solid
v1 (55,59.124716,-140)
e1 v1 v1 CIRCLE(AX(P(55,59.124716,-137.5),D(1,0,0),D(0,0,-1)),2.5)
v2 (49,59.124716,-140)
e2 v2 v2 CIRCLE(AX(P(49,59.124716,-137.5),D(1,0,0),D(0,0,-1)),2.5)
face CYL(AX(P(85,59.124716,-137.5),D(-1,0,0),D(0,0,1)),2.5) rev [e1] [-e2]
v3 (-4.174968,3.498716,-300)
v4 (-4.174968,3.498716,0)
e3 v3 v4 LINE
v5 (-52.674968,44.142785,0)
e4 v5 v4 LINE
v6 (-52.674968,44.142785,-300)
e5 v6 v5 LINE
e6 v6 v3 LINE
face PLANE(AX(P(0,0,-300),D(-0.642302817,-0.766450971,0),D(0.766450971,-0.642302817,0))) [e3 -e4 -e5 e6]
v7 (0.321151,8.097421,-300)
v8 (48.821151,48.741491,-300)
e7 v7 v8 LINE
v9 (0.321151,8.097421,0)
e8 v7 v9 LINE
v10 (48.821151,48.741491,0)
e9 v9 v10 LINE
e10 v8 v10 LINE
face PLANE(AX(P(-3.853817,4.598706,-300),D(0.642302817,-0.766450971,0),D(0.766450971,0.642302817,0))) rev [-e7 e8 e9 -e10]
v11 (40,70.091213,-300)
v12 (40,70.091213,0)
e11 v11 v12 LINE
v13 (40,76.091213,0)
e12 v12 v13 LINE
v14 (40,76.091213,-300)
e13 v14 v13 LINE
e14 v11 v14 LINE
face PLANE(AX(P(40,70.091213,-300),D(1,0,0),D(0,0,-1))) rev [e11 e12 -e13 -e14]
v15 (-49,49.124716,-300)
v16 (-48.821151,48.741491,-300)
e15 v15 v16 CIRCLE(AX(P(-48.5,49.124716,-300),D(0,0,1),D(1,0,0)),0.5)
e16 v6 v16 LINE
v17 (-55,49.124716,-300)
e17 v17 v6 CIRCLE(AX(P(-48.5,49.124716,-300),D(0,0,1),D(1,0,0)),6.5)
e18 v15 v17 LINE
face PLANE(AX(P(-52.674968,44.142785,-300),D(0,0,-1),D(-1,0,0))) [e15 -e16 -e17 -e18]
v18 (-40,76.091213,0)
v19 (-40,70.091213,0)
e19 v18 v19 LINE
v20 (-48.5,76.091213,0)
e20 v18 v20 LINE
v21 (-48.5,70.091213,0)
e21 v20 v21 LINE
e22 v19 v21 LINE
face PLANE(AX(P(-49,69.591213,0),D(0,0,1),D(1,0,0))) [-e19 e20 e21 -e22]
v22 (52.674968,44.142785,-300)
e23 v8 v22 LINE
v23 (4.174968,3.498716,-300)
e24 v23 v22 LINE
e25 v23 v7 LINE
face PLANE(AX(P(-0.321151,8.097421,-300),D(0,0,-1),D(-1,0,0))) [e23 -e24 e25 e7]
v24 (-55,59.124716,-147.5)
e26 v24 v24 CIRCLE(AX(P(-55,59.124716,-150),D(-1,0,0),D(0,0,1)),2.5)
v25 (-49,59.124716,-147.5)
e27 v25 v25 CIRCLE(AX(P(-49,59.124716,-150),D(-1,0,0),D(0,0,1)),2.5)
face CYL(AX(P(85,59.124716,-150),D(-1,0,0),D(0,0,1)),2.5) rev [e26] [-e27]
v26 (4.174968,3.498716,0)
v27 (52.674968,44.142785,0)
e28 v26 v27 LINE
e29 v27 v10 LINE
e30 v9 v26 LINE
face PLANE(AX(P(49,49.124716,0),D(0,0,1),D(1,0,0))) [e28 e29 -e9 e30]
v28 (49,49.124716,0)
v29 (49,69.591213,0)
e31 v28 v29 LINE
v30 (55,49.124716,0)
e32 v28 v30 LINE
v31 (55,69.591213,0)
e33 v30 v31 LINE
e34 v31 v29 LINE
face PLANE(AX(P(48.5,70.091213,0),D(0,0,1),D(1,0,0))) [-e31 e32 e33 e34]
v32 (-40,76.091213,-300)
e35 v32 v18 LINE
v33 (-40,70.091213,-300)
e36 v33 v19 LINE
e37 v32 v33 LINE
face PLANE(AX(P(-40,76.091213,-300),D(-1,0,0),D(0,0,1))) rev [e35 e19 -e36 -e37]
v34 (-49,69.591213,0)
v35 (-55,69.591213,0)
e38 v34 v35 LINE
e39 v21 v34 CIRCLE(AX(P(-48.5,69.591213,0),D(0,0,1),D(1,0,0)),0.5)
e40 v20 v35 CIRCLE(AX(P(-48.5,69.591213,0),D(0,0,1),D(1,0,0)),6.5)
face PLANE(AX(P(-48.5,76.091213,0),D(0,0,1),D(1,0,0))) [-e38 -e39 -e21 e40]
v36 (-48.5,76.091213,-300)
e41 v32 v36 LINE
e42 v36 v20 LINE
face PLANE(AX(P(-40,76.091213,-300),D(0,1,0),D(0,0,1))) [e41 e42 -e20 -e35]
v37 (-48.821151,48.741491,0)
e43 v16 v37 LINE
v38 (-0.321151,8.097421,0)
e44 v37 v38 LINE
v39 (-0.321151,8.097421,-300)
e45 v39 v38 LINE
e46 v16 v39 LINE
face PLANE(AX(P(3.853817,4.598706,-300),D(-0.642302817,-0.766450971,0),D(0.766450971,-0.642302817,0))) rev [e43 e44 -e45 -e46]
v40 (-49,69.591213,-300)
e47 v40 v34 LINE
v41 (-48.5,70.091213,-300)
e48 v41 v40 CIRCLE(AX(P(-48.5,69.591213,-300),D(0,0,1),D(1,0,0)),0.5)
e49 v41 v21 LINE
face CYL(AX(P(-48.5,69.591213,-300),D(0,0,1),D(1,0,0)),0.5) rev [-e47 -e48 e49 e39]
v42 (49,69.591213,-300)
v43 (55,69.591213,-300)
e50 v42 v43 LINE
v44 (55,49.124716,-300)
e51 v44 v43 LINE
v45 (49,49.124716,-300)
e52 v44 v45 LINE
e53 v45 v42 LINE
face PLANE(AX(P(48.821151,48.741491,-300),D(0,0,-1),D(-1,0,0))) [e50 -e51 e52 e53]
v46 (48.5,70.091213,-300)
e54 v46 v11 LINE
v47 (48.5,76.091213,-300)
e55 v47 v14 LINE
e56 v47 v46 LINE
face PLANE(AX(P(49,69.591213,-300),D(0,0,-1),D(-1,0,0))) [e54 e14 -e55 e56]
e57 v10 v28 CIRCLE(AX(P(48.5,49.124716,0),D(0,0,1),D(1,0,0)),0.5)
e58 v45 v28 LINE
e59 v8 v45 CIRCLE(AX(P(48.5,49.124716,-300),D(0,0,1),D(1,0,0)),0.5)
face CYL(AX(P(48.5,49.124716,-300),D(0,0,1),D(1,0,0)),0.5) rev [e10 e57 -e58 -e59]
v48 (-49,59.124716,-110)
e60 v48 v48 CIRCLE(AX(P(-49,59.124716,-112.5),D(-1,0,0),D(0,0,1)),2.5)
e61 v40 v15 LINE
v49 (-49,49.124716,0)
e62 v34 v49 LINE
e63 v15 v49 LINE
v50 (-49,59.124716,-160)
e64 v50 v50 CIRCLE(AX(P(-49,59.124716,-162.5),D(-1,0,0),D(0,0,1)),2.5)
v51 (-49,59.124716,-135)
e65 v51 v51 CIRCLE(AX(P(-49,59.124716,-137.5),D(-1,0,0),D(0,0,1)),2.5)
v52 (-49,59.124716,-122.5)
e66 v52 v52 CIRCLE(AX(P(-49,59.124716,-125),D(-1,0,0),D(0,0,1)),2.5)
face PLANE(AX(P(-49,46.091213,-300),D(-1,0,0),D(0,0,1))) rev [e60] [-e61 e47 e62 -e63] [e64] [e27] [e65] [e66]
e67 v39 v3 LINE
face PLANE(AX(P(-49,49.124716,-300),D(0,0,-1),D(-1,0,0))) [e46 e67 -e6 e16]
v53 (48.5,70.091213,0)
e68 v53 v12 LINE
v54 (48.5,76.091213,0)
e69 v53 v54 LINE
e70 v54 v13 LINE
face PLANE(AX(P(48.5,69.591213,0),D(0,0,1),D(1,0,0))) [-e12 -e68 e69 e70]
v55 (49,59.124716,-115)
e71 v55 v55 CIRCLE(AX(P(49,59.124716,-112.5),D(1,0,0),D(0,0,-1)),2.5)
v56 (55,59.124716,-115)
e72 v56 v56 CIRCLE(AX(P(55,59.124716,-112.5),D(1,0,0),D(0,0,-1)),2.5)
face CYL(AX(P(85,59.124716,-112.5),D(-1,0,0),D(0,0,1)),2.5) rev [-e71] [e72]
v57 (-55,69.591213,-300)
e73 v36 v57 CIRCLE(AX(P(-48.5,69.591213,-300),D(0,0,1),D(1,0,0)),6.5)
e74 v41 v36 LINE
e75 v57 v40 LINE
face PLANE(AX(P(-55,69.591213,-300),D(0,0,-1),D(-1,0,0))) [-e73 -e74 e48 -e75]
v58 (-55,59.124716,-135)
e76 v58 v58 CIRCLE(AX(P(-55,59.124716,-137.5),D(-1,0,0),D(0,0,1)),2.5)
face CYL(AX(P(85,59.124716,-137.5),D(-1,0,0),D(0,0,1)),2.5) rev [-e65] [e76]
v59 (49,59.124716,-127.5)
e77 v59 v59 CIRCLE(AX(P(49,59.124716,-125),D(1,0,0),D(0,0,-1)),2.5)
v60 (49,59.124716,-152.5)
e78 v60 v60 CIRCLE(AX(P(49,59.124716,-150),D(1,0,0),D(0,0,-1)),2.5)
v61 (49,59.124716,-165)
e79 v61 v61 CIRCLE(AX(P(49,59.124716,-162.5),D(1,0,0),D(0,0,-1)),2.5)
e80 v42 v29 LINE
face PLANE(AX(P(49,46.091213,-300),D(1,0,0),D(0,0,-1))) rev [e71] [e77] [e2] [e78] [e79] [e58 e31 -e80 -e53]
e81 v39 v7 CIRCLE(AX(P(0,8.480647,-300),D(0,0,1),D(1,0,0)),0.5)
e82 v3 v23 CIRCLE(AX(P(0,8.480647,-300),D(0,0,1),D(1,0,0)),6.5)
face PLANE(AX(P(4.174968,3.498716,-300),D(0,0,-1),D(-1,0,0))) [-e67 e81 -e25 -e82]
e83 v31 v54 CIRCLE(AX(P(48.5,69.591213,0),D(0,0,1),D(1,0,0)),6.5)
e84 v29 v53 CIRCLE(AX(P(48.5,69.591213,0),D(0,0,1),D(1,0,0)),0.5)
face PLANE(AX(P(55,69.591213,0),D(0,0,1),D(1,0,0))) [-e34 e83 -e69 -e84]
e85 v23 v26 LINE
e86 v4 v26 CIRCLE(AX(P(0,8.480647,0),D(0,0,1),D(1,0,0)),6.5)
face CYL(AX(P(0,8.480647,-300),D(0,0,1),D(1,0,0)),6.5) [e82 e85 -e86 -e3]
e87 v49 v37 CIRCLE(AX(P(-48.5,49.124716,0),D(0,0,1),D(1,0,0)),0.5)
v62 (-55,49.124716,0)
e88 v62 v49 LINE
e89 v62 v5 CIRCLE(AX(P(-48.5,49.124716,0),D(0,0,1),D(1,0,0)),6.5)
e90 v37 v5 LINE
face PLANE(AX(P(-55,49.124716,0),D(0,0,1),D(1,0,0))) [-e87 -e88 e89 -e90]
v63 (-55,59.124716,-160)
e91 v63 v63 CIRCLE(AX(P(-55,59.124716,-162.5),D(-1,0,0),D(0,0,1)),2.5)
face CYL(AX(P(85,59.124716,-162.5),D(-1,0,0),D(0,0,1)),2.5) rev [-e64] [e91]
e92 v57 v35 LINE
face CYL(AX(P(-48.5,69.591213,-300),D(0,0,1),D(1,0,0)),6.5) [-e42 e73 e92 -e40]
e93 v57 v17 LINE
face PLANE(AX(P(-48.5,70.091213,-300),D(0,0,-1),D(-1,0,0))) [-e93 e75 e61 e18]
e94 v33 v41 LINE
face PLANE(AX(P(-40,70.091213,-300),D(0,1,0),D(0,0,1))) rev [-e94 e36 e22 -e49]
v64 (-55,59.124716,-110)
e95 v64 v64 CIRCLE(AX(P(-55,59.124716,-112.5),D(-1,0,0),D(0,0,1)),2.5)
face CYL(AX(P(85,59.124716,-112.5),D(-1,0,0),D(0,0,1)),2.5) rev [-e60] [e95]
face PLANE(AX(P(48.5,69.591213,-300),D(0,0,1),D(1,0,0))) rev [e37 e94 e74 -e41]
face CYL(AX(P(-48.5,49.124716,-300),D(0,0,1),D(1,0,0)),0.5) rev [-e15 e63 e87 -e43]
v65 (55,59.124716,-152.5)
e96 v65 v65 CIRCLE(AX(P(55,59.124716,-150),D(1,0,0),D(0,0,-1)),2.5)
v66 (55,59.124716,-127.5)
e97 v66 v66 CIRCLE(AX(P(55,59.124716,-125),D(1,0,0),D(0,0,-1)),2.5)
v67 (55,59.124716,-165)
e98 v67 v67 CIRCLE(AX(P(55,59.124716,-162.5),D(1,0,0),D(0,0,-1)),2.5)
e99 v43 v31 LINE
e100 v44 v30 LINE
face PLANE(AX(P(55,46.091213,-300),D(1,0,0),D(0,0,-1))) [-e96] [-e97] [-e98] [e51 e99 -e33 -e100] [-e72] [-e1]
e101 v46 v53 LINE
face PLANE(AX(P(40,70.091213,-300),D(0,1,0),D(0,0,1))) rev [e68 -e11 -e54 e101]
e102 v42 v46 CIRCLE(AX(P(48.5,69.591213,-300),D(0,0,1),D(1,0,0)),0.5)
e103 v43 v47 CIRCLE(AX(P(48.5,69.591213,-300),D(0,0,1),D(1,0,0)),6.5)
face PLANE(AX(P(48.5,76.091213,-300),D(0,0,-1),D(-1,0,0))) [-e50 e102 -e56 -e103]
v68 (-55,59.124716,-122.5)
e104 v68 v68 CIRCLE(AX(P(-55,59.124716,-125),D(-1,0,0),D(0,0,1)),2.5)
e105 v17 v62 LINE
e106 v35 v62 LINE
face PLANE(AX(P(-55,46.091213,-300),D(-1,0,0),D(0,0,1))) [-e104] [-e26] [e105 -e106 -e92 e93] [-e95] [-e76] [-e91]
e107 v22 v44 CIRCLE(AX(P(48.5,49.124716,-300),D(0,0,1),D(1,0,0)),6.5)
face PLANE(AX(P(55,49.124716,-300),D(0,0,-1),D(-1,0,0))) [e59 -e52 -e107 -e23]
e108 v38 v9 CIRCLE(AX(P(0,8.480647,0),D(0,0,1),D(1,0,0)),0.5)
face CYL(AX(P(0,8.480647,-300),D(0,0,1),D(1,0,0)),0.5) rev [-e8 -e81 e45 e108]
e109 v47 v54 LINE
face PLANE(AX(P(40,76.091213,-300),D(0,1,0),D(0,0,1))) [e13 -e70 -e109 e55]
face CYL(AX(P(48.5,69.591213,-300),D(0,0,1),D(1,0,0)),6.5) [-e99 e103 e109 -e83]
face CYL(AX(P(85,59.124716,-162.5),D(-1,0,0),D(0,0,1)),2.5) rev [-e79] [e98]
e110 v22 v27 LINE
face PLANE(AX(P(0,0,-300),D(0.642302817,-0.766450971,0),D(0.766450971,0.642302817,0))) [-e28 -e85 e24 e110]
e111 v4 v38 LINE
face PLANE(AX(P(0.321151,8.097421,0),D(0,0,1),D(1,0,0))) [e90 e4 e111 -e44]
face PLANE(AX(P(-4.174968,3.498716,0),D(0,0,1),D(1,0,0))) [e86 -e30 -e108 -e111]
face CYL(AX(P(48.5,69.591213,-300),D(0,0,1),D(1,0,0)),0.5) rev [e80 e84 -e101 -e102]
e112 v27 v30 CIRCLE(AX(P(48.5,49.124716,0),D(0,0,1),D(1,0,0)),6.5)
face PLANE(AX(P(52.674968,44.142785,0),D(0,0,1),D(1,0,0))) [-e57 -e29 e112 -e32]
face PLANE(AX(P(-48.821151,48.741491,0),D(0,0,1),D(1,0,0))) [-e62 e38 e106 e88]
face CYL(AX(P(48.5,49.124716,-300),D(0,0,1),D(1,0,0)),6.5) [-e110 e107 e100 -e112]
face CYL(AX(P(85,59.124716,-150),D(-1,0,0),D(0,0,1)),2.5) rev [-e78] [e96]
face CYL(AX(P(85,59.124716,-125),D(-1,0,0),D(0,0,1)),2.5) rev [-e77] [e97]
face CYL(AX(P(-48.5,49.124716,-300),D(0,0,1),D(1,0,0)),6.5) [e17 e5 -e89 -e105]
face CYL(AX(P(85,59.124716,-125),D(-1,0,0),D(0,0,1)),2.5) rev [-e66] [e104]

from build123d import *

# Parameters (mm, degrees)
BASE_FLANGE2_DEPTH = 300
SKETCH10_R         = 2.5
CUT_EXTRUDE1_DEPTH = 140


# Sheet-metal steps are written as plain solids
with BuildPart() as part:
    # Sketch1 → Base-Flange2 (new body)
    with BuildSketch(Plane.XY):
        with BuildLine():
            Line((-40, 76.091212948), (-48.5, 76.091212948))
            ThreePointArc((-48.5, 76.091212948), (-53.096194078, 74.187407026), (-55, 69.591212948))
            Line((-55, 69.591212948), (-55, 49.12471643))
            ThreePointArc((-55, 49.12471643), (-54.390131323, 46.375834295), (-52.67496831, 44.142785116))
            Line((-52.67496831, 44.142785116), (-4.17496831, 3.498715517))
            ThreePointArc((-4.17496831, 3.498715517), (0, 1.98064683), (4.17496831, 3.498715517))
            Line((4.17496831, 3.498715517), (52.67496831, 44.142785116))
            ThreePointArc((52.67496831, 44.142785116), (54.390131323, 46.375834295), (55, 49.12471643))
            Line((55, 49.12471643), (55, 69.591212948))
            ThreePointArc((55, 69.591212948), (53.096194078, 74.187407026), (48.5, 76.091212948))
            Line((48.5, 76.091212948), (40, 76.091212948))
            Line((40, 76.091212948), (40, 70.091212948))
            Line((40, 70.091212948), (48.5, 70.091212948))
            ThreePointArc((48.5, 70.091212948), (48.853553391, 69.944766339), (49, 69.591212948))
            Line((49, 69.591212948), (49, 49.12471643))
            ThreePointArc((49, 49.12471643), (48.953087025, 48.913263958), (48.821151408, 48.741490944))
            Line((48.821151408, 48.741490944), (0.321151408, 8.097421345))
            ThreePointArc((0.321151408, 8.097421345), (0, 7.98064683), (-0.321151408, 8.097421345))
            Line((-0.321151408, 8.097421345), (-48.821151408, 48.741490944))
            ThreePointArc((-48.821151408, 48.741490944), (-48.953087025, 48.913263958), (-49, 49.12471643))
            Line((-49, 49.12471643), (-49, 69.591212948))
            ThreePointArc((-49, 69.591212948), (-48.853553391, 69.944766339), (-48.5, 70.091212948))
            Line((-48.5, 70.091212948), (-40, 70.091212948))
            Line((-40, 70.091212948), (-40, 76.091212948))
        make_face()
    extrude(amount=-BASE_FLANGE2_DEPTH)

    # Sketch10 → Cut-Extrude1 (cut)
    with BuildSketch(Plane.ZY.offset(55)):
        with Locations(Location((-112.5, 59.12471643, 0), (0, 0, 180))):
            Circle(SKETCH10_R)
        with Locations(Location((-125, 59.12471643, 0), (0, 0, 180))):
            Circle(SKETCH10_R)
        with Locations(Location((-137.5, 59.12471643, 0), (0, 0, 180))):
            Circle(SKETCH10_R)
        with Locations(Location((-150, 59.12471643, 0), (0, 0, 180))):
            Circle(SKETCH10_R)
        with Locations(Location((-162.5, 59.12471643, 0), (0, 0, 180))):
            Circle(SKETCH10_R)
    extrude(amount=-CUT_EXTRUDE1_DEPTH, mode=Mode.SUBTRACT)


solid = part.part
